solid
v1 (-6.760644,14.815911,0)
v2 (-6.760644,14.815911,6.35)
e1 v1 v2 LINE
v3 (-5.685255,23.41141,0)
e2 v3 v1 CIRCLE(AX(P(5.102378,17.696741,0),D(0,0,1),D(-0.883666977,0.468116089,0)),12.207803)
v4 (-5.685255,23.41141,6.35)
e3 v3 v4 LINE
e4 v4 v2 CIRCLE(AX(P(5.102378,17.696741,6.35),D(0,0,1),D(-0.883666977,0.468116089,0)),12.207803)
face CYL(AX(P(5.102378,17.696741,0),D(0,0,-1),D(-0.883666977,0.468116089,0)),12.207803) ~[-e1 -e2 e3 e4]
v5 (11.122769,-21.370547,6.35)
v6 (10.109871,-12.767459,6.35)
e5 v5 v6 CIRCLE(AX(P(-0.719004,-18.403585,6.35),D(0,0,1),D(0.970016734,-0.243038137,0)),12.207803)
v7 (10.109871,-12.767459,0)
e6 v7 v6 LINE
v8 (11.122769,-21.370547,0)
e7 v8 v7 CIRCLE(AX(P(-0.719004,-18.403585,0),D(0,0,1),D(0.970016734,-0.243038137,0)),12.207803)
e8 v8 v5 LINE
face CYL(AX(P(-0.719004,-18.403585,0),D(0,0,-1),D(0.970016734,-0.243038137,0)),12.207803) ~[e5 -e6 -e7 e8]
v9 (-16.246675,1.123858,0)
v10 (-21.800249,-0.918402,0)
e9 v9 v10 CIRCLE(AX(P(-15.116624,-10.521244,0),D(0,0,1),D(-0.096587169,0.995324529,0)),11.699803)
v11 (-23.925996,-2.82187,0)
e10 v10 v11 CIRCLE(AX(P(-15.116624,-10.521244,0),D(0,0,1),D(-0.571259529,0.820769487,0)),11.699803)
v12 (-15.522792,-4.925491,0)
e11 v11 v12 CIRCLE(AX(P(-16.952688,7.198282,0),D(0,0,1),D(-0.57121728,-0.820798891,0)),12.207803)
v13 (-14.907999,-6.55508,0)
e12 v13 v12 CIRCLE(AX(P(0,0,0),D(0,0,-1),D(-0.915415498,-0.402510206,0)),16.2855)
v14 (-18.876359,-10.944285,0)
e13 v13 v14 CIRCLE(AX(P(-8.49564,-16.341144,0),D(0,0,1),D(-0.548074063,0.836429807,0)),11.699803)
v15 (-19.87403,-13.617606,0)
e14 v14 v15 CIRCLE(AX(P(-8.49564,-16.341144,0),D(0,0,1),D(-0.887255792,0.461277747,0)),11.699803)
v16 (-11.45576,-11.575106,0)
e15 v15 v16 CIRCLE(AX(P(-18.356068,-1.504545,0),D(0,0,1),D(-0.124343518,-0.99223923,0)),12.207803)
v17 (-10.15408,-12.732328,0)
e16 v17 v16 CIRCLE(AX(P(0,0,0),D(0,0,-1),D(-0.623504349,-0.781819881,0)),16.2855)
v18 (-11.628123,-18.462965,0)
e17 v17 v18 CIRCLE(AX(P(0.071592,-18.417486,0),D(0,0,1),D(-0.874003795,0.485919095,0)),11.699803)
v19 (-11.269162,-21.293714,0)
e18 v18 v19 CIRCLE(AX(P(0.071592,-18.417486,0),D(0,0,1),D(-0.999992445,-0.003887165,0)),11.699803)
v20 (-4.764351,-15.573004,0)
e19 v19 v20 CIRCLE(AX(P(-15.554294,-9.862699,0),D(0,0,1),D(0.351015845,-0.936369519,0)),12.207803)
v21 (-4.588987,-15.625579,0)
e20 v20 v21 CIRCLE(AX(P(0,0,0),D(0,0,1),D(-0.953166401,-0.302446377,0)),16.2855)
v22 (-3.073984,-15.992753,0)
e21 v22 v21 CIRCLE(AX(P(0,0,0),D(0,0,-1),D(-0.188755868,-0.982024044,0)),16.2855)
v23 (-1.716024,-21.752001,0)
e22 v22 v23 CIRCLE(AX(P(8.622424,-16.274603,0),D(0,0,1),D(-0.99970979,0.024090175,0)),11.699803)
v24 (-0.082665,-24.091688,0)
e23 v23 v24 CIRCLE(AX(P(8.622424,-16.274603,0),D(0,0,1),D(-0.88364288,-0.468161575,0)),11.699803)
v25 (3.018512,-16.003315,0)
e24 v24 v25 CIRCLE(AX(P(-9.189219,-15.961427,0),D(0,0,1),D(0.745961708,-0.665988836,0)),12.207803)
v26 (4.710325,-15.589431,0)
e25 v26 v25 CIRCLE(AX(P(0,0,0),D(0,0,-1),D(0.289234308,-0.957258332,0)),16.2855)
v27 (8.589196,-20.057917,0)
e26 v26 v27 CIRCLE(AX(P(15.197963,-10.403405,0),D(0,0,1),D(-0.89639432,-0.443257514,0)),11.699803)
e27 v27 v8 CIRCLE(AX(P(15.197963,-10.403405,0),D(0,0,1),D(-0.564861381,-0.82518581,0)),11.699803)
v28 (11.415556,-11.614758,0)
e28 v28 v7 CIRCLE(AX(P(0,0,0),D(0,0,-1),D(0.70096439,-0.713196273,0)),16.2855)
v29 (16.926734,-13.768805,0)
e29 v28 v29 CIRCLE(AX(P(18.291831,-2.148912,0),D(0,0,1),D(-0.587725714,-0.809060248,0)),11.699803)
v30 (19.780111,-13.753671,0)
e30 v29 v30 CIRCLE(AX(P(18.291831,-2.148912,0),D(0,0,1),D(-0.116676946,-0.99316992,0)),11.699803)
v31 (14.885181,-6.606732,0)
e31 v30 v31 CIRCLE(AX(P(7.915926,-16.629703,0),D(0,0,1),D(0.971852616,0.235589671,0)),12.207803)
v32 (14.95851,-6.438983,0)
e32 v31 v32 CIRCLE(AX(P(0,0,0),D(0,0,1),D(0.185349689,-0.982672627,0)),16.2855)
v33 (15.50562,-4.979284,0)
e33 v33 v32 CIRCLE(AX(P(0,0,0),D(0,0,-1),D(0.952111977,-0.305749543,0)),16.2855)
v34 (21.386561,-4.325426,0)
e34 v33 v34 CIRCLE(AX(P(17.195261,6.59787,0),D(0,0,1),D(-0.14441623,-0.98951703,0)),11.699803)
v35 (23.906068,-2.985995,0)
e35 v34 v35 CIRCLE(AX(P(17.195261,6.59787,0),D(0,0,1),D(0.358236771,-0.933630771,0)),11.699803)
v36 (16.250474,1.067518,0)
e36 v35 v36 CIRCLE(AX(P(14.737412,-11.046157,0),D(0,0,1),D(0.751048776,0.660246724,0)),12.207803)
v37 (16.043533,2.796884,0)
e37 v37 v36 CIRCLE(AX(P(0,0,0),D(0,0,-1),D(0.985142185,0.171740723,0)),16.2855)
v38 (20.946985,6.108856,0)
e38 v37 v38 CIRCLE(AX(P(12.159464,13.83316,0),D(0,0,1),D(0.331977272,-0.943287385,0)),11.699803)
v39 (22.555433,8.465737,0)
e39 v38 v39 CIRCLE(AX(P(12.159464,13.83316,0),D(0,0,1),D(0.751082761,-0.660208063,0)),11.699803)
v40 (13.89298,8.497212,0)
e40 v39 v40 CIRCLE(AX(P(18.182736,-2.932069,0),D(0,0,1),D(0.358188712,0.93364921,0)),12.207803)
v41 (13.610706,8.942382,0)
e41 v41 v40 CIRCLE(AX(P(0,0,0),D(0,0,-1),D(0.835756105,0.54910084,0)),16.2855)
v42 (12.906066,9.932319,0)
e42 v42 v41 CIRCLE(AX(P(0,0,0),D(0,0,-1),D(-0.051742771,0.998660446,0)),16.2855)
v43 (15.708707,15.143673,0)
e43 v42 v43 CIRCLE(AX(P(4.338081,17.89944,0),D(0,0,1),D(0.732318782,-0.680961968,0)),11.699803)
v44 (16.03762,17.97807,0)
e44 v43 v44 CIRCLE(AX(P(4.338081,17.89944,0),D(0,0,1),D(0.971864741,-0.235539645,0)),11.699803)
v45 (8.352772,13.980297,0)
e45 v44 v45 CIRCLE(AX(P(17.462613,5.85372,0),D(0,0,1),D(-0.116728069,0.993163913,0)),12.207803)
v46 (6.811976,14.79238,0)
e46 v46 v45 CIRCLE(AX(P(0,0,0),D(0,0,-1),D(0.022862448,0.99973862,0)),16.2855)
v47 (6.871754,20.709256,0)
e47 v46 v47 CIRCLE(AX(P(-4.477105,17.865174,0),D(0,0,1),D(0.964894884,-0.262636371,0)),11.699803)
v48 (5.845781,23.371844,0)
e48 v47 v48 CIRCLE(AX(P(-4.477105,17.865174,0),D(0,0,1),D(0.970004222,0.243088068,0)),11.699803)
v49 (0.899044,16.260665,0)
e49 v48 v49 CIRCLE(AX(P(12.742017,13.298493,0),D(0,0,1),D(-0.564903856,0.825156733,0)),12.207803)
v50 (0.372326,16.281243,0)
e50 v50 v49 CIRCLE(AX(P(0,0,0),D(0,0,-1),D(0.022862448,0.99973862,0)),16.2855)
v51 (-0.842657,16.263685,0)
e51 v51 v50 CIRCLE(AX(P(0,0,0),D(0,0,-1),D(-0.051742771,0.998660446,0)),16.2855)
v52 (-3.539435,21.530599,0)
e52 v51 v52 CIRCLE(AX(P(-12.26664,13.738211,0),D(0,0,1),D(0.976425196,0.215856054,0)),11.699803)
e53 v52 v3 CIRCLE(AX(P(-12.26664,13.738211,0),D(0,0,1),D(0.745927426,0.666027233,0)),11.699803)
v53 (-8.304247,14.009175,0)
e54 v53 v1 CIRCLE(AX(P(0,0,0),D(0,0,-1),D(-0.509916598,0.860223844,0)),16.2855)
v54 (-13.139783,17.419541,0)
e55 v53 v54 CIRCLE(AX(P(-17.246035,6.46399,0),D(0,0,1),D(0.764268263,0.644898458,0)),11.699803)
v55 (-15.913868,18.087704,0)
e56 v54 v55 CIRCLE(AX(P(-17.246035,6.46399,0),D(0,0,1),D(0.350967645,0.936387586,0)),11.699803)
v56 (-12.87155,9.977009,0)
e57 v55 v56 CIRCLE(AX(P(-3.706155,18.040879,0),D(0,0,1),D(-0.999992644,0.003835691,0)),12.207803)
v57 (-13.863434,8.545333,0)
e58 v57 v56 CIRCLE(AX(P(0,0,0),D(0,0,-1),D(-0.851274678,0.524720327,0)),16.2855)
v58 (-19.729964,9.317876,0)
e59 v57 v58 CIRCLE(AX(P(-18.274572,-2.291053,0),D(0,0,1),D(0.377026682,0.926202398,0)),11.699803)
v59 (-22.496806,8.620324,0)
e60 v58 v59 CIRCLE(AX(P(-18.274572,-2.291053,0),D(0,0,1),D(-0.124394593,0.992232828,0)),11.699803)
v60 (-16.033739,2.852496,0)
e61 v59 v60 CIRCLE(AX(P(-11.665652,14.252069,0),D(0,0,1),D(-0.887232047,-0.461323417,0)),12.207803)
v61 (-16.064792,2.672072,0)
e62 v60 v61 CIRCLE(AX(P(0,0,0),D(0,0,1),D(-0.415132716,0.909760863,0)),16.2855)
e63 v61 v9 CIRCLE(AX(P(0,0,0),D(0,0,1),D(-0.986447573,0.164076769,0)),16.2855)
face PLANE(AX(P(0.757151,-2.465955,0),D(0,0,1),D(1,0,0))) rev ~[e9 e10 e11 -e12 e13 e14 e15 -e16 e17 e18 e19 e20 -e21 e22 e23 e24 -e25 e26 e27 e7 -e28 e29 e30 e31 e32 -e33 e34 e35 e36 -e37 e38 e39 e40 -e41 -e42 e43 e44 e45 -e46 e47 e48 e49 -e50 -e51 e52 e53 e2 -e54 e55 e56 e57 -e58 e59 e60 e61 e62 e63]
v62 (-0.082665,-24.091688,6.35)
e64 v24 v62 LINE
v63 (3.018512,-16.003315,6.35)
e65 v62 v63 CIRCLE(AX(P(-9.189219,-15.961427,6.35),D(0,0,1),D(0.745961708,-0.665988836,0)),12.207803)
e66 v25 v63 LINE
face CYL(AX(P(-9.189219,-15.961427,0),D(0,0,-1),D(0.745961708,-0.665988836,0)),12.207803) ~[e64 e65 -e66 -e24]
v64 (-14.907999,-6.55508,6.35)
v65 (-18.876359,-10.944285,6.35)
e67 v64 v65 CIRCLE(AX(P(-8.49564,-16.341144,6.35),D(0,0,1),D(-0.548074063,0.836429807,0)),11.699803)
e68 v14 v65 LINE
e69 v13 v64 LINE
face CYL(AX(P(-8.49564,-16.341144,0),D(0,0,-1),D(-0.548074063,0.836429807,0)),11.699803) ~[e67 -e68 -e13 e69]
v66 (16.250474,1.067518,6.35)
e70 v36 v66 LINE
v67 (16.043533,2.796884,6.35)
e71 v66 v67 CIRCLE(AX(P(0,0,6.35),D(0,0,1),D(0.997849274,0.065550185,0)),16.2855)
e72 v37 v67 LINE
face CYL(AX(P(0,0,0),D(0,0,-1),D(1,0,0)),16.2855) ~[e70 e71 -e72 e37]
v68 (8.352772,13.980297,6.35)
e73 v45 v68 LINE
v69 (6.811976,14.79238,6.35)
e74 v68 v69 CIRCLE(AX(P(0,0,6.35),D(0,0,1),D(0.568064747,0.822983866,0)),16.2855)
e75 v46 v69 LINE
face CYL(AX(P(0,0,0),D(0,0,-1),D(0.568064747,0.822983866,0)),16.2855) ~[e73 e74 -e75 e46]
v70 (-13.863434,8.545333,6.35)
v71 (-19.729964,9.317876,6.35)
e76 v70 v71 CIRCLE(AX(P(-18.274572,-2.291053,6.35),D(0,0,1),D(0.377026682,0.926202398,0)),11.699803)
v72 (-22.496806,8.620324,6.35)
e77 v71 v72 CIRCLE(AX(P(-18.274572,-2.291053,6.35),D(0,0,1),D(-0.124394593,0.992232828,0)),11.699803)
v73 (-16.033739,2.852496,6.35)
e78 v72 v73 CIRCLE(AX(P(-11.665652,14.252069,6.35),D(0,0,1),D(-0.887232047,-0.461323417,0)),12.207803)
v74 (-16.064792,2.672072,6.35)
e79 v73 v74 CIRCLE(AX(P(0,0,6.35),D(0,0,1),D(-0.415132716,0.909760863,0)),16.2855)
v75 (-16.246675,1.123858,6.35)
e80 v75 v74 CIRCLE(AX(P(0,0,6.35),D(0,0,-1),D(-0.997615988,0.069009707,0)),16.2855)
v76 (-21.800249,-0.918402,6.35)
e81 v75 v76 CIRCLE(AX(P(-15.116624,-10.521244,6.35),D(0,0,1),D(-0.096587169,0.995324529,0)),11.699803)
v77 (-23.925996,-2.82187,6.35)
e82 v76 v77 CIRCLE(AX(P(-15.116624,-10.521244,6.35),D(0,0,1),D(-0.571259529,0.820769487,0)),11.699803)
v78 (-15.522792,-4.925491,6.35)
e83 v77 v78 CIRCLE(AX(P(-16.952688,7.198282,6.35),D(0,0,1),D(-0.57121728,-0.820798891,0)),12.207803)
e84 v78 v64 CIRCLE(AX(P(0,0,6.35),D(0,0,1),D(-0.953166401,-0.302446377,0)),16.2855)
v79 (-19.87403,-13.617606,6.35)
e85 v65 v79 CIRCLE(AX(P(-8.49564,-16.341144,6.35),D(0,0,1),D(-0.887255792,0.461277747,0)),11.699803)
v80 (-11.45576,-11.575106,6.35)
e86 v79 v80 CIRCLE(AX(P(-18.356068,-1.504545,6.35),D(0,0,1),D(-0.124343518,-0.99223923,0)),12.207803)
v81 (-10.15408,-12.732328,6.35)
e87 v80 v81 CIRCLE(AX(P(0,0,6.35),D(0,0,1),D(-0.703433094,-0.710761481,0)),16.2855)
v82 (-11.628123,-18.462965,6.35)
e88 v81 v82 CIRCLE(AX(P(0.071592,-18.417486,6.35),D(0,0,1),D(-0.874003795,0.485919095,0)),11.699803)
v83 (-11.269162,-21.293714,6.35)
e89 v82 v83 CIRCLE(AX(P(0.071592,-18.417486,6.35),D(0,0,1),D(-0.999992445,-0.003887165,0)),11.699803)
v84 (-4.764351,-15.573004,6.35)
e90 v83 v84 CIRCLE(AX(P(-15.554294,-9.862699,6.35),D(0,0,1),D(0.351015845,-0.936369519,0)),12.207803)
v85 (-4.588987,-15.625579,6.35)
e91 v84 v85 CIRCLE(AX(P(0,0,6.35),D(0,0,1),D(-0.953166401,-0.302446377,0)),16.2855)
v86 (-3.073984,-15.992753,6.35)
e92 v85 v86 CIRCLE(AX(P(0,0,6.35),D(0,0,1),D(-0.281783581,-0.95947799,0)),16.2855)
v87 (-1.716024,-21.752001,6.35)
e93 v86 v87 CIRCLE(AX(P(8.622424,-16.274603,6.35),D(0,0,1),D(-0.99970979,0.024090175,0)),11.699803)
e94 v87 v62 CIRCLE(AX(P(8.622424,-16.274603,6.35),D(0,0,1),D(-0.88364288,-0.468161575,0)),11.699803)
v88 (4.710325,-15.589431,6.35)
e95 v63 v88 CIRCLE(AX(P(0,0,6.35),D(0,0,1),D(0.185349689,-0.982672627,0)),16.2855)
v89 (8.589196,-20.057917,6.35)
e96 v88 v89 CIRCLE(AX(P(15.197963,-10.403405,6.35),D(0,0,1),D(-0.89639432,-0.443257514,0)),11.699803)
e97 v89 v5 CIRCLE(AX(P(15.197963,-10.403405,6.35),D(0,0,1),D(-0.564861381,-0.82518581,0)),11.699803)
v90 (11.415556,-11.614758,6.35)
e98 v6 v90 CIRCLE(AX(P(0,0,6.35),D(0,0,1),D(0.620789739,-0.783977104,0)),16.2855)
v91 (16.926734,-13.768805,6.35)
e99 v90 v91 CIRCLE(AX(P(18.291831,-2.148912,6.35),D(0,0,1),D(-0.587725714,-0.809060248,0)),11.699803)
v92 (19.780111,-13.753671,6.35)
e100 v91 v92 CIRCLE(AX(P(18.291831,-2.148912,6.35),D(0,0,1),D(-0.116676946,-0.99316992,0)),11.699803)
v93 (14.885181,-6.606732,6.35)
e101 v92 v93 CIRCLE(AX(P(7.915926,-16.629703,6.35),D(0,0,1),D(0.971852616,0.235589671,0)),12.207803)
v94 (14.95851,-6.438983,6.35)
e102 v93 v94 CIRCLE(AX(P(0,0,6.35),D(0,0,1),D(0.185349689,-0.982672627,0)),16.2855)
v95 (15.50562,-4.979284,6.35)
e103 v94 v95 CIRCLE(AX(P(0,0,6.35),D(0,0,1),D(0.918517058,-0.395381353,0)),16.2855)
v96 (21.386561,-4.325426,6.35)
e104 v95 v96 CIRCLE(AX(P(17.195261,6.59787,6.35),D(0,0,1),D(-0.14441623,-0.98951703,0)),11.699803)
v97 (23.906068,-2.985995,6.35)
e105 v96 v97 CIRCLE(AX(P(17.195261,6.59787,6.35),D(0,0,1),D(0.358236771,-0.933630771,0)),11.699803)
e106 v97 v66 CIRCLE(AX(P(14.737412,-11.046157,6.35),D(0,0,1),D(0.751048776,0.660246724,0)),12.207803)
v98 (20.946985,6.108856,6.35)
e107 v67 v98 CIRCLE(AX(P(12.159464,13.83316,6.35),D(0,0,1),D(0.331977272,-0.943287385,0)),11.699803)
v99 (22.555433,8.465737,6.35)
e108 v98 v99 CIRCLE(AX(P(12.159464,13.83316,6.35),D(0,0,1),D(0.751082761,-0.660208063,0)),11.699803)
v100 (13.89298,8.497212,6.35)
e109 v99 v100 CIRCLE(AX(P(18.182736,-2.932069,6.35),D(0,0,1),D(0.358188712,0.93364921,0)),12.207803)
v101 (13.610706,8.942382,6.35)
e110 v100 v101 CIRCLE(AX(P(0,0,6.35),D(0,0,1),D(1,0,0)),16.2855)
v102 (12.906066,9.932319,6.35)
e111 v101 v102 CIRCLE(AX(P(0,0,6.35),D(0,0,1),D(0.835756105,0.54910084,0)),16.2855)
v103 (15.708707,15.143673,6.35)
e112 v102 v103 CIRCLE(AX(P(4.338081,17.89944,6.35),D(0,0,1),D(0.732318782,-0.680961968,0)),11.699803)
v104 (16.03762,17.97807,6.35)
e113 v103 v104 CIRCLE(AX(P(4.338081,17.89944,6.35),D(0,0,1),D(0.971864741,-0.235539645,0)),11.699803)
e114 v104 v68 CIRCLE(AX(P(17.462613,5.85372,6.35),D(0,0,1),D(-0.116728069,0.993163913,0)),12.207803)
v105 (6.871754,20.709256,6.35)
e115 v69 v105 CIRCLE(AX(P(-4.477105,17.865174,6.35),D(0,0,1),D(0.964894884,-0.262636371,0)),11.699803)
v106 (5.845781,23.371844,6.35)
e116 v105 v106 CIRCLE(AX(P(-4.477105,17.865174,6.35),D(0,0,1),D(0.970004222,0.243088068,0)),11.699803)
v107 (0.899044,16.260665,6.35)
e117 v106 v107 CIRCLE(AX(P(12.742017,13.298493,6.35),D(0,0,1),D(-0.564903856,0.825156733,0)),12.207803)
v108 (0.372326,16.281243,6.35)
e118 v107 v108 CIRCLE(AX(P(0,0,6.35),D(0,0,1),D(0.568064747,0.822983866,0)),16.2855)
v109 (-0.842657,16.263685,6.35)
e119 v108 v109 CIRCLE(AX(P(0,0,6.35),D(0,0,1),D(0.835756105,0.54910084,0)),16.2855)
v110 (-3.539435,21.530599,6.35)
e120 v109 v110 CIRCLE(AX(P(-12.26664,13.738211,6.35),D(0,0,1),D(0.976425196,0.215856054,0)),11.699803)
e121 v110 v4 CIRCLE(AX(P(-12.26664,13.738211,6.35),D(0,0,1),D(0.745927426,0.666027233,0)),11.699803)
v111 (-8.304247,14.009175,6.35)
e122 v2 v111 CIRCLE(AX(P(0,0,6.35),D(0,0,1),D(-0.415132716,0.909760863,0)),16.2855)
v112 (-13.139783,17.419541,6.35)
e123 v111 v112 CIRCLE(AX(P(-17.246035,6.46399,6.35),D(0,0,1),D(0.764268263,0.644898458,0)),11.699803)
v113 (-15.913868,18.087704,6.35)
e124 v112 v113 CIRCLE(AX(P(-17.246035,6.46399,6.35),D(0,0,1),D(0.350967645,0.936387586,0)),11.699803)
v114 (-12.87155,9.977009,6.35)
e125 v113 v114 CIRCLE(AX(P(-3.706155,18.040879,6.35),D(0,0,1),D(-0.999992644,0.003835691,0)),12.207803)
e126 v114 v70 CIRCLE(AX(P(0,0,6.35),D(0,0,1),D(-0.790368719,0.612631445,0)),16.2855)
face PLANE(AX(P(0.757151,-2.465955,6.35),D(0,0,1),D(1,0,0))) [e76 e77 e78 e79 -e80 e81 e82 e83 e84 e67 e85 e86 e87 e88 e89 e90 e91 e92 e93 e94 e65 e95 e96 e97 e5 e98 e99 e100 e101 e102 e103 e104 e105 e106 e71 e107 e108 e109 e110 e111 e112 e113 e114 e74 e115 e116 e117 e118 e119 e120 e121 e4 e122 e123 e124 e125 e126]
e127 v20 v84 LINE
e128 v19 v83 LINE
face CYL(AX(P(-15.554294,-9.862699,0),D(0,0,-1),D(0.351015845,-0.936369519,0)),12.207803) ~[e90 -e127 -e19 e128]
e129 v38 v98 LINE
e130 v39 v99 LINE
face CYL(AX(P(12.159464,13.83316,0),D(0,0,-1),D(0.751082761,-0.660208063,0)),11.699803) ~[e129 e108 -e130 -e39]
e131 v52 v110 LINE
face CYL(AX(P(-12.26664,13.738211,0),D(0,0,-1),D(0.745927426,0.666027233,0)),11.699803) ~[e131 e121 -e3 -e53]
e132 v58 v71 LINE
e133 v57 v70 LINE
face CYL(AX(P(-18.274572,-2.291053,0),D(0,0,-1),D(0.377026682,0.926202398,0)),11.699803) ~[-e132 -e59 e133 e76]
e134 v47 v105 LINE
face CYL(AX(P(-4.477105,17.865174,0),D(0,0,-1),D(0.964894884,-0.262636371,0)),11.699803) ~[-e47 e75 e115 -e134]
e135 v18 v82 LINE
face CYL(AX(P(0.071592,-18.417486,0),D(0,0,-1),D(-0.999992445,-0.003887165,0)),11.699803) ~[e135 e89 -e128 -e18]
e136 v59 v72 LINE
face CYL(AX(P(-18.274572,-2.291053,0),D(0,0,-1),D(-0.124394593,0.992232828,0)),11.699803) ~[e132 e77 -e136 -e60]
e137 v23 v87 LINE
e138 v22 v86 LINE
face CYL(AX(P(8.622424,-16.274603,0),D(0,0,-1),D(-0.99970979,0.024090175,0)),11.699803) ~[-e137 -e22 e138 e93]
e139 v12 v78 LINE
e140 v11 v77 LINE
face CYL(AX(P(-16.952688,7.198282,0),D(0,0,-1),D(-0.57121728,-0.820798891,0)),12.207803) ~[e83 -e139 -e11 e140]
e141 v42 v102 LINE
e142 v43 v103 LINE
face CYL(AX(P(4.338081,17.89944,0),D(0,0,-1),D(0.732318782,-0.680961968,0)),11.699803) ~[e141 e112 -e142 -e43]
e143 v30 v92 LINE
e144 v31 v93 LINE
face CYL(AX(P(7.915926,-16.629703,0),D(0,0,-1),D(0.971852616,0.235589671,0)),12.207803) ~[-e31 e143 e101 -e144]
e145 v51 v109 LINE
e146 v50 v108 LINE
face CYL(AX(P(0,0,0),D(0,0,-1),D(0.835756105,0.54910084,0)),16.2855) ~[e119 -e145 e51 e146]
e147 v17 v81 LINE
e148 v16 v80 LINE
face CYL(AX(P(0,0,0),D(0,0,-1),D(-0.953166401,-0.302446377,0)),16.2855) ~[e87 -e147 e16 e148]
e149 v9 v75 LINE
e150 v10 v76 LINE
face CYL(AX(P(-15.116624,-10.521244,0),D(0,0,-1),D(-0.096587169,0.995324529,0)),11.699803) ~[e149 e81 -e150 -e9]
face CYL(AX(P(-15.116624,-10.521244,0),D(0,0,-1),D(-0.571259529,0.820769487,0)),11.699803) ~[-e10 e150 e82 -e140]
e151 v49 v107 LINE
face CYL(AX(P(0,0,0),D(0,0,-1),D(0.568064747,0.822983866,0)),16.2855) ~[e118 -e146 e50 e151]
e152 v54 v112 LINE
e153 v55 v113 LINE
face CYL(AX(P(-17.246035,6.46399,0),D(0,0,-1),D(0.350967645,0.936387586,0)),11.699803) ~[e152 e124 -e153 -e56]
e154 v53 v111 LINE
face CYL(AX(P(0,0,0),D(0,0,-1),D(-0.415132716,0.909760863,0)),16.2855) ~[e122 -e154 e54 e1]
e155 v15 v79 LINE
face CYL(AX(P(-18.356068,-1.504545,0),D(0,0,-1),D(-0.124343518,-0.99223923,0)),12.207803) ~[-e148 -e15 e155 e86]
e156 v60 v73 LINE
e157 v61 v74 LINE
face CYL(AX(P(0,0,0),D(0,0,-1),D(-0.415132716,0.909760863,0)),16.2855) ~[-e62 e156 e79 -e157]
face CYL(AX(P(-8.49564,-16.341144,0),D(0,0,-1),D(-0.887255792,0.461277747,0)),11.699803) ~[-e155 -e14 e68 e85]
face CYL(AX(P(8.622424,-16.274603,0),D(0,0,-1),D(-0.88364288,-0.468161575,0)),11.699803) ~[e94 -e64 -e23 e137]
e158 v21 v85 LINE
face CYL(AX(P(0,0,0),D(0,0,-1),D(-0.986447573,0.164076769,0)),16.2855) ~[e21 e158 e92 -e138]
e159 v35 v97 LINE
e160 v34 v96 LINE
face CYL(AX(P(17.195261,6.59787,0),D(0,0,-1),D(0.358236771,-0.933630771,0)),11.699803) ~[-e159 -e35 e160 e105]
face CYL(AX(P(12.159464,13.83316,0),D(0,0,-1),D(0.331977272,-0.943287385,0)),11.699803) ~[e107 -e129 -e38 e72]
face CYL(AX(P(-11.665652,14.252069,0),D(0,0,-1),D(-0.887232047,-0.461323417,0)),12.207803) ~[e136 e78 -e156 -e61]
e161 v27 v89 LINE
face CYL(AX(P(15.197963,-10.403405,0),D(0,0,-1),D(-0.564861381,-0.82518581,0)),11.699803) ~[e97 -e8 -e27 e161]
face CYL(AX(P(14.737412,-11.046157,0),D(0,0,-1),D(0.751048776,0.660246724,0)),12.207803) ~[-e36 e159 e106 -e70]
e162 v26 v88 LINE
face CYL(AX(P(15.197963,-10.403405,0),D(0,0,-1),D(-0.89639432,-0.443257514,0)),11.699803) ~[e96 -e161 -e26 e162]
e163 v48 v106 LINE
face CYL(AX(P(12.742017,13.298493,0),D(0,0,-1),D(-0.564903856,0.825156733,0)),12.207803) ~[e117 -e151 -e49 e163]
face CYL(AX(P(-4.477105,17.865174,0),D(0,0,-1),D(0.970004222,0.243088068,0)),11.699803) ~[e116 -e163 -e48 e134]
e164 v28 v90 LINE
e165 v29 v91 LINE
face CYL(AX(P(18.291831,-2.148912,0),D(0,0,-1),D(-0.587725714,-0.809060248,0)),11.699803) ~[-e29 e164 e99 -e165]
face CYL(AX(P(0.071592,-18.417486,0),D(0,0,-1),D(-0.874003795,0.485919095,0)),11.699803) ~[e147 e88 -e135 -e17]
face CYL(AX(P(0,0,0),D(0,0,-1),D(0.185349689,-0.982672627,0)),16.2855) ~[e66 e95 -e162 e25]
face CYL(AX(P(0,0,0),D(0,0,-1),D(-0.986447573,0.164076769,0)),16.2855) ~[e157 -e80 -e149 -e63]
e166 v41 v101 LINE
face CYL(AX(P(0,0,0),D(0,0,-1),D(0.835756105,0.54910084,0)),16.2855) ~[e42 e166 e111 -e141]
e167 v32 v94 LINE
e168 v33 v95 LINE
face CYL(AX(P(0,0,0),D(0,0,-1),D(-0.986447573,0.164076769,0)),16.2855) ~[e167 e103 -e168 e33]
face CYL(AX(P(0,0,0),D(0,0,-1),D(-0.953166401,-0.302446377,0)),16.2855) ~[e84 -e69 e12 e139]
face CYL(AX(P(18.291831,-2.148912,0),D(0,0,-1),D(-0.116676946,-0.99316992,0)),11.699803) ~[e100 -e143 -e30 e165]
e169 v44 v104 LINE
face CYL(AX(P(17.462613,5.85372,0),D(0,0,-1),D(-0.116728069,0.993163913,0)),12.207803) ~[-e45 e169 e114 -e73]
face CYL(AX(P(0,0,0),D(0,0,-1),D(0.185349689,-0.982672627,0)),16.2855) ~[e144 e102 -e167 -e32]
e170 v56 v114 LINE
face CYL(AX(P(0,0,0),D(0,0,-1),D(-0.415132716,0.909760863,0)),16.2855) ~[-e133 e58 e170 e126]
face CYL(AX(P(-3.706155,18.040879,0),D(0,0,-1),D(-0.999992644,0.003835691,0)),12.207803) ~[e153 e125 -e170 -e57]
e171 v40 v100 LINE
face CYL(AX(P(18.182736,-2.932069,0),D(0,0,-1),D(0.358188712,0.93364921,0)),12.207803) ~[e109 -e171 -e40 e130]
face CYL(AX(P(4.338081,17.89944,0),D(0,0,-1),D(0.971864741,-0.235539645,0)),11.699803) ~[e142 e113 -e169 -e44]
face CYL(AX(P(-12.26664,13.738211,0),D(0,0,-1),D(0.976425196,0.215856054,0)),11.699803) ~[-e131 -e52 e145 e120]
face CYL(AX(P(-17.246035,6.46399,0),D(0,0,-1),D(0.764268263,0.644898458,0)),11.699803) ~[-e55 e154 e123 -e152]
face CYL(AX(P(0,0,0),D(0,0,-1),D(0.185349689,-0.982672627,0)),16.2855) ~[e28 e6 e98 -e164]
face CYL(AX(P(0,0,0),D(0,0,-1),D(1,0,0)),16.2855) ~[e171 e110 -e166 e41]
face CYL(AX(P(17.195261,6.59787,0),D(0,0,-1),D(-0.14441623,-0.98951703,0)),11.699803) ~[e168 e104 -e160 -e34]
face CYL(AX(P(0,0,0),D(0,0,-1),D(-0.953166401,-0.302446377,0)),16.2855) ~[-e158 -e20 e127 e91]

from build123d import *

# Parameters (mm, degrees)
F1_DEPTH = 6.35
F2_COUNT = 13


with BuildPart() as f1:
    # F0 (on Top) → F1 (new body)
    with BuildSketch(Plane.XY):
        with BuildLine():
            ThreePointArc((-2.1437179533, 7.8720496255), (-8.1726662795, 2.7780663468), (-16.0647920269, 2.6720722418))
            ThreePointArc((-16.0647920269, 2.6720722418), (-1.3405858897, -16.2302292777), (16.2855000824, 0))
            ThreePointArc((16.2855000824, 0), (15.6024784663, 4.6669238952), (13.6107061205, 8.9423817764))
            ThreePointArc((13.6107061205, 8.9423817764), (5.9298500897, 5.517014013), (-2.1437179533, 7.8720496255))
        make_face()
        with BuildLine():
            ThreePointArc((-6.7606438886, 14.815910608), (-12.9274256428, 9.9045029751), (-16.0647920269, 2.6720722418))
            ThreePointArc((-16.0647920269, 2.6720722418), (-8.1726662795, 2.7780663468), (-2.1437179533, 7.8720496255))
            ThreePointArc((-2.1437179533, 7.8720496255), (-5.0634420885, 10.9375567243), (-6.7606438886, 14.815910608))
        make_face()
        with BuildLine():
            ThreePointArc((-3.5394354787, 21.5305990191), (-4.554792608, 22.5366665267), (-5.6852551034, 23.4114101898))
            ThreePointArc((-5.6852551034, 23.4114101898), (-7.0109905191, 19.2122527461), (-6.7606438886, 14.815910608))
            ThreePointArc((-6.7606438886, 14.815910608), (-3.8699558436, 15.8190061225), (-0.8426569014, 16.2636847695))
            ThreePointArc((-0.8426569014, 16.2636847695), (-1.8525780021, 19.0704452205), (-3.5394354787, 21.5305990191))
        make_face()
        with BuildLine():
            ThreePointArc((-2.1437179533, 7.8720496255), (5.9298500897, 5.517014013), (13.6107061205, 8.9423817764))
            ThreePointArc((13.6107061205, 8.9423817764), (7.3590855135, 14.5279514502), (-0.8426569014, 16.2636847695))
            ThreePointArc((-0.8426569014, 16.2636847695), (-0.6359958834, 15.0084567204), (-0.5668363347, 13.7382113944))
            ThreePointArc((-0.5668363347, 13.7382113944), (-0.9679319708, 10.7010083415), (-2.1437179533, 7.8720496255))
        make_face()
        with BuildLine():
            ThreePointArc((-0.8426569014, 16.2636847695), (-3.8699558436, 15.8190061225), (-6.7606438886, 14.815910608))
            ThreePointArc((-6.7606438886, 14.815910608), (-5.0634420885, 10.9375567243), (-2.1437179533, 7.8720496255))
            ThreePointArc((-2.1437179533, 7.8720496255), (-0.9679319708, 10.7010083415), (-0.5668363347, 13.7382113944))
            ThreePointArc((-0.5668363347, 13.7382113944), (-0.6359958834, 15.0084567204), (-0.8426569014, 16.2636847695))
        make_face()
    extrude(amount=F1_DEPTH)

    # F2: F1 ×13 about axis
    f2_axis = Axis((0, 0, 6.35), (0, 0, 1))


with BuildPart() as f1_1:
    add(f1.part)
    for i in range(1, F2_COUNT):
        add(f1.part.rotate(f2_axis, i * 360 / F2_COUNT))


solid = f1_1.part
